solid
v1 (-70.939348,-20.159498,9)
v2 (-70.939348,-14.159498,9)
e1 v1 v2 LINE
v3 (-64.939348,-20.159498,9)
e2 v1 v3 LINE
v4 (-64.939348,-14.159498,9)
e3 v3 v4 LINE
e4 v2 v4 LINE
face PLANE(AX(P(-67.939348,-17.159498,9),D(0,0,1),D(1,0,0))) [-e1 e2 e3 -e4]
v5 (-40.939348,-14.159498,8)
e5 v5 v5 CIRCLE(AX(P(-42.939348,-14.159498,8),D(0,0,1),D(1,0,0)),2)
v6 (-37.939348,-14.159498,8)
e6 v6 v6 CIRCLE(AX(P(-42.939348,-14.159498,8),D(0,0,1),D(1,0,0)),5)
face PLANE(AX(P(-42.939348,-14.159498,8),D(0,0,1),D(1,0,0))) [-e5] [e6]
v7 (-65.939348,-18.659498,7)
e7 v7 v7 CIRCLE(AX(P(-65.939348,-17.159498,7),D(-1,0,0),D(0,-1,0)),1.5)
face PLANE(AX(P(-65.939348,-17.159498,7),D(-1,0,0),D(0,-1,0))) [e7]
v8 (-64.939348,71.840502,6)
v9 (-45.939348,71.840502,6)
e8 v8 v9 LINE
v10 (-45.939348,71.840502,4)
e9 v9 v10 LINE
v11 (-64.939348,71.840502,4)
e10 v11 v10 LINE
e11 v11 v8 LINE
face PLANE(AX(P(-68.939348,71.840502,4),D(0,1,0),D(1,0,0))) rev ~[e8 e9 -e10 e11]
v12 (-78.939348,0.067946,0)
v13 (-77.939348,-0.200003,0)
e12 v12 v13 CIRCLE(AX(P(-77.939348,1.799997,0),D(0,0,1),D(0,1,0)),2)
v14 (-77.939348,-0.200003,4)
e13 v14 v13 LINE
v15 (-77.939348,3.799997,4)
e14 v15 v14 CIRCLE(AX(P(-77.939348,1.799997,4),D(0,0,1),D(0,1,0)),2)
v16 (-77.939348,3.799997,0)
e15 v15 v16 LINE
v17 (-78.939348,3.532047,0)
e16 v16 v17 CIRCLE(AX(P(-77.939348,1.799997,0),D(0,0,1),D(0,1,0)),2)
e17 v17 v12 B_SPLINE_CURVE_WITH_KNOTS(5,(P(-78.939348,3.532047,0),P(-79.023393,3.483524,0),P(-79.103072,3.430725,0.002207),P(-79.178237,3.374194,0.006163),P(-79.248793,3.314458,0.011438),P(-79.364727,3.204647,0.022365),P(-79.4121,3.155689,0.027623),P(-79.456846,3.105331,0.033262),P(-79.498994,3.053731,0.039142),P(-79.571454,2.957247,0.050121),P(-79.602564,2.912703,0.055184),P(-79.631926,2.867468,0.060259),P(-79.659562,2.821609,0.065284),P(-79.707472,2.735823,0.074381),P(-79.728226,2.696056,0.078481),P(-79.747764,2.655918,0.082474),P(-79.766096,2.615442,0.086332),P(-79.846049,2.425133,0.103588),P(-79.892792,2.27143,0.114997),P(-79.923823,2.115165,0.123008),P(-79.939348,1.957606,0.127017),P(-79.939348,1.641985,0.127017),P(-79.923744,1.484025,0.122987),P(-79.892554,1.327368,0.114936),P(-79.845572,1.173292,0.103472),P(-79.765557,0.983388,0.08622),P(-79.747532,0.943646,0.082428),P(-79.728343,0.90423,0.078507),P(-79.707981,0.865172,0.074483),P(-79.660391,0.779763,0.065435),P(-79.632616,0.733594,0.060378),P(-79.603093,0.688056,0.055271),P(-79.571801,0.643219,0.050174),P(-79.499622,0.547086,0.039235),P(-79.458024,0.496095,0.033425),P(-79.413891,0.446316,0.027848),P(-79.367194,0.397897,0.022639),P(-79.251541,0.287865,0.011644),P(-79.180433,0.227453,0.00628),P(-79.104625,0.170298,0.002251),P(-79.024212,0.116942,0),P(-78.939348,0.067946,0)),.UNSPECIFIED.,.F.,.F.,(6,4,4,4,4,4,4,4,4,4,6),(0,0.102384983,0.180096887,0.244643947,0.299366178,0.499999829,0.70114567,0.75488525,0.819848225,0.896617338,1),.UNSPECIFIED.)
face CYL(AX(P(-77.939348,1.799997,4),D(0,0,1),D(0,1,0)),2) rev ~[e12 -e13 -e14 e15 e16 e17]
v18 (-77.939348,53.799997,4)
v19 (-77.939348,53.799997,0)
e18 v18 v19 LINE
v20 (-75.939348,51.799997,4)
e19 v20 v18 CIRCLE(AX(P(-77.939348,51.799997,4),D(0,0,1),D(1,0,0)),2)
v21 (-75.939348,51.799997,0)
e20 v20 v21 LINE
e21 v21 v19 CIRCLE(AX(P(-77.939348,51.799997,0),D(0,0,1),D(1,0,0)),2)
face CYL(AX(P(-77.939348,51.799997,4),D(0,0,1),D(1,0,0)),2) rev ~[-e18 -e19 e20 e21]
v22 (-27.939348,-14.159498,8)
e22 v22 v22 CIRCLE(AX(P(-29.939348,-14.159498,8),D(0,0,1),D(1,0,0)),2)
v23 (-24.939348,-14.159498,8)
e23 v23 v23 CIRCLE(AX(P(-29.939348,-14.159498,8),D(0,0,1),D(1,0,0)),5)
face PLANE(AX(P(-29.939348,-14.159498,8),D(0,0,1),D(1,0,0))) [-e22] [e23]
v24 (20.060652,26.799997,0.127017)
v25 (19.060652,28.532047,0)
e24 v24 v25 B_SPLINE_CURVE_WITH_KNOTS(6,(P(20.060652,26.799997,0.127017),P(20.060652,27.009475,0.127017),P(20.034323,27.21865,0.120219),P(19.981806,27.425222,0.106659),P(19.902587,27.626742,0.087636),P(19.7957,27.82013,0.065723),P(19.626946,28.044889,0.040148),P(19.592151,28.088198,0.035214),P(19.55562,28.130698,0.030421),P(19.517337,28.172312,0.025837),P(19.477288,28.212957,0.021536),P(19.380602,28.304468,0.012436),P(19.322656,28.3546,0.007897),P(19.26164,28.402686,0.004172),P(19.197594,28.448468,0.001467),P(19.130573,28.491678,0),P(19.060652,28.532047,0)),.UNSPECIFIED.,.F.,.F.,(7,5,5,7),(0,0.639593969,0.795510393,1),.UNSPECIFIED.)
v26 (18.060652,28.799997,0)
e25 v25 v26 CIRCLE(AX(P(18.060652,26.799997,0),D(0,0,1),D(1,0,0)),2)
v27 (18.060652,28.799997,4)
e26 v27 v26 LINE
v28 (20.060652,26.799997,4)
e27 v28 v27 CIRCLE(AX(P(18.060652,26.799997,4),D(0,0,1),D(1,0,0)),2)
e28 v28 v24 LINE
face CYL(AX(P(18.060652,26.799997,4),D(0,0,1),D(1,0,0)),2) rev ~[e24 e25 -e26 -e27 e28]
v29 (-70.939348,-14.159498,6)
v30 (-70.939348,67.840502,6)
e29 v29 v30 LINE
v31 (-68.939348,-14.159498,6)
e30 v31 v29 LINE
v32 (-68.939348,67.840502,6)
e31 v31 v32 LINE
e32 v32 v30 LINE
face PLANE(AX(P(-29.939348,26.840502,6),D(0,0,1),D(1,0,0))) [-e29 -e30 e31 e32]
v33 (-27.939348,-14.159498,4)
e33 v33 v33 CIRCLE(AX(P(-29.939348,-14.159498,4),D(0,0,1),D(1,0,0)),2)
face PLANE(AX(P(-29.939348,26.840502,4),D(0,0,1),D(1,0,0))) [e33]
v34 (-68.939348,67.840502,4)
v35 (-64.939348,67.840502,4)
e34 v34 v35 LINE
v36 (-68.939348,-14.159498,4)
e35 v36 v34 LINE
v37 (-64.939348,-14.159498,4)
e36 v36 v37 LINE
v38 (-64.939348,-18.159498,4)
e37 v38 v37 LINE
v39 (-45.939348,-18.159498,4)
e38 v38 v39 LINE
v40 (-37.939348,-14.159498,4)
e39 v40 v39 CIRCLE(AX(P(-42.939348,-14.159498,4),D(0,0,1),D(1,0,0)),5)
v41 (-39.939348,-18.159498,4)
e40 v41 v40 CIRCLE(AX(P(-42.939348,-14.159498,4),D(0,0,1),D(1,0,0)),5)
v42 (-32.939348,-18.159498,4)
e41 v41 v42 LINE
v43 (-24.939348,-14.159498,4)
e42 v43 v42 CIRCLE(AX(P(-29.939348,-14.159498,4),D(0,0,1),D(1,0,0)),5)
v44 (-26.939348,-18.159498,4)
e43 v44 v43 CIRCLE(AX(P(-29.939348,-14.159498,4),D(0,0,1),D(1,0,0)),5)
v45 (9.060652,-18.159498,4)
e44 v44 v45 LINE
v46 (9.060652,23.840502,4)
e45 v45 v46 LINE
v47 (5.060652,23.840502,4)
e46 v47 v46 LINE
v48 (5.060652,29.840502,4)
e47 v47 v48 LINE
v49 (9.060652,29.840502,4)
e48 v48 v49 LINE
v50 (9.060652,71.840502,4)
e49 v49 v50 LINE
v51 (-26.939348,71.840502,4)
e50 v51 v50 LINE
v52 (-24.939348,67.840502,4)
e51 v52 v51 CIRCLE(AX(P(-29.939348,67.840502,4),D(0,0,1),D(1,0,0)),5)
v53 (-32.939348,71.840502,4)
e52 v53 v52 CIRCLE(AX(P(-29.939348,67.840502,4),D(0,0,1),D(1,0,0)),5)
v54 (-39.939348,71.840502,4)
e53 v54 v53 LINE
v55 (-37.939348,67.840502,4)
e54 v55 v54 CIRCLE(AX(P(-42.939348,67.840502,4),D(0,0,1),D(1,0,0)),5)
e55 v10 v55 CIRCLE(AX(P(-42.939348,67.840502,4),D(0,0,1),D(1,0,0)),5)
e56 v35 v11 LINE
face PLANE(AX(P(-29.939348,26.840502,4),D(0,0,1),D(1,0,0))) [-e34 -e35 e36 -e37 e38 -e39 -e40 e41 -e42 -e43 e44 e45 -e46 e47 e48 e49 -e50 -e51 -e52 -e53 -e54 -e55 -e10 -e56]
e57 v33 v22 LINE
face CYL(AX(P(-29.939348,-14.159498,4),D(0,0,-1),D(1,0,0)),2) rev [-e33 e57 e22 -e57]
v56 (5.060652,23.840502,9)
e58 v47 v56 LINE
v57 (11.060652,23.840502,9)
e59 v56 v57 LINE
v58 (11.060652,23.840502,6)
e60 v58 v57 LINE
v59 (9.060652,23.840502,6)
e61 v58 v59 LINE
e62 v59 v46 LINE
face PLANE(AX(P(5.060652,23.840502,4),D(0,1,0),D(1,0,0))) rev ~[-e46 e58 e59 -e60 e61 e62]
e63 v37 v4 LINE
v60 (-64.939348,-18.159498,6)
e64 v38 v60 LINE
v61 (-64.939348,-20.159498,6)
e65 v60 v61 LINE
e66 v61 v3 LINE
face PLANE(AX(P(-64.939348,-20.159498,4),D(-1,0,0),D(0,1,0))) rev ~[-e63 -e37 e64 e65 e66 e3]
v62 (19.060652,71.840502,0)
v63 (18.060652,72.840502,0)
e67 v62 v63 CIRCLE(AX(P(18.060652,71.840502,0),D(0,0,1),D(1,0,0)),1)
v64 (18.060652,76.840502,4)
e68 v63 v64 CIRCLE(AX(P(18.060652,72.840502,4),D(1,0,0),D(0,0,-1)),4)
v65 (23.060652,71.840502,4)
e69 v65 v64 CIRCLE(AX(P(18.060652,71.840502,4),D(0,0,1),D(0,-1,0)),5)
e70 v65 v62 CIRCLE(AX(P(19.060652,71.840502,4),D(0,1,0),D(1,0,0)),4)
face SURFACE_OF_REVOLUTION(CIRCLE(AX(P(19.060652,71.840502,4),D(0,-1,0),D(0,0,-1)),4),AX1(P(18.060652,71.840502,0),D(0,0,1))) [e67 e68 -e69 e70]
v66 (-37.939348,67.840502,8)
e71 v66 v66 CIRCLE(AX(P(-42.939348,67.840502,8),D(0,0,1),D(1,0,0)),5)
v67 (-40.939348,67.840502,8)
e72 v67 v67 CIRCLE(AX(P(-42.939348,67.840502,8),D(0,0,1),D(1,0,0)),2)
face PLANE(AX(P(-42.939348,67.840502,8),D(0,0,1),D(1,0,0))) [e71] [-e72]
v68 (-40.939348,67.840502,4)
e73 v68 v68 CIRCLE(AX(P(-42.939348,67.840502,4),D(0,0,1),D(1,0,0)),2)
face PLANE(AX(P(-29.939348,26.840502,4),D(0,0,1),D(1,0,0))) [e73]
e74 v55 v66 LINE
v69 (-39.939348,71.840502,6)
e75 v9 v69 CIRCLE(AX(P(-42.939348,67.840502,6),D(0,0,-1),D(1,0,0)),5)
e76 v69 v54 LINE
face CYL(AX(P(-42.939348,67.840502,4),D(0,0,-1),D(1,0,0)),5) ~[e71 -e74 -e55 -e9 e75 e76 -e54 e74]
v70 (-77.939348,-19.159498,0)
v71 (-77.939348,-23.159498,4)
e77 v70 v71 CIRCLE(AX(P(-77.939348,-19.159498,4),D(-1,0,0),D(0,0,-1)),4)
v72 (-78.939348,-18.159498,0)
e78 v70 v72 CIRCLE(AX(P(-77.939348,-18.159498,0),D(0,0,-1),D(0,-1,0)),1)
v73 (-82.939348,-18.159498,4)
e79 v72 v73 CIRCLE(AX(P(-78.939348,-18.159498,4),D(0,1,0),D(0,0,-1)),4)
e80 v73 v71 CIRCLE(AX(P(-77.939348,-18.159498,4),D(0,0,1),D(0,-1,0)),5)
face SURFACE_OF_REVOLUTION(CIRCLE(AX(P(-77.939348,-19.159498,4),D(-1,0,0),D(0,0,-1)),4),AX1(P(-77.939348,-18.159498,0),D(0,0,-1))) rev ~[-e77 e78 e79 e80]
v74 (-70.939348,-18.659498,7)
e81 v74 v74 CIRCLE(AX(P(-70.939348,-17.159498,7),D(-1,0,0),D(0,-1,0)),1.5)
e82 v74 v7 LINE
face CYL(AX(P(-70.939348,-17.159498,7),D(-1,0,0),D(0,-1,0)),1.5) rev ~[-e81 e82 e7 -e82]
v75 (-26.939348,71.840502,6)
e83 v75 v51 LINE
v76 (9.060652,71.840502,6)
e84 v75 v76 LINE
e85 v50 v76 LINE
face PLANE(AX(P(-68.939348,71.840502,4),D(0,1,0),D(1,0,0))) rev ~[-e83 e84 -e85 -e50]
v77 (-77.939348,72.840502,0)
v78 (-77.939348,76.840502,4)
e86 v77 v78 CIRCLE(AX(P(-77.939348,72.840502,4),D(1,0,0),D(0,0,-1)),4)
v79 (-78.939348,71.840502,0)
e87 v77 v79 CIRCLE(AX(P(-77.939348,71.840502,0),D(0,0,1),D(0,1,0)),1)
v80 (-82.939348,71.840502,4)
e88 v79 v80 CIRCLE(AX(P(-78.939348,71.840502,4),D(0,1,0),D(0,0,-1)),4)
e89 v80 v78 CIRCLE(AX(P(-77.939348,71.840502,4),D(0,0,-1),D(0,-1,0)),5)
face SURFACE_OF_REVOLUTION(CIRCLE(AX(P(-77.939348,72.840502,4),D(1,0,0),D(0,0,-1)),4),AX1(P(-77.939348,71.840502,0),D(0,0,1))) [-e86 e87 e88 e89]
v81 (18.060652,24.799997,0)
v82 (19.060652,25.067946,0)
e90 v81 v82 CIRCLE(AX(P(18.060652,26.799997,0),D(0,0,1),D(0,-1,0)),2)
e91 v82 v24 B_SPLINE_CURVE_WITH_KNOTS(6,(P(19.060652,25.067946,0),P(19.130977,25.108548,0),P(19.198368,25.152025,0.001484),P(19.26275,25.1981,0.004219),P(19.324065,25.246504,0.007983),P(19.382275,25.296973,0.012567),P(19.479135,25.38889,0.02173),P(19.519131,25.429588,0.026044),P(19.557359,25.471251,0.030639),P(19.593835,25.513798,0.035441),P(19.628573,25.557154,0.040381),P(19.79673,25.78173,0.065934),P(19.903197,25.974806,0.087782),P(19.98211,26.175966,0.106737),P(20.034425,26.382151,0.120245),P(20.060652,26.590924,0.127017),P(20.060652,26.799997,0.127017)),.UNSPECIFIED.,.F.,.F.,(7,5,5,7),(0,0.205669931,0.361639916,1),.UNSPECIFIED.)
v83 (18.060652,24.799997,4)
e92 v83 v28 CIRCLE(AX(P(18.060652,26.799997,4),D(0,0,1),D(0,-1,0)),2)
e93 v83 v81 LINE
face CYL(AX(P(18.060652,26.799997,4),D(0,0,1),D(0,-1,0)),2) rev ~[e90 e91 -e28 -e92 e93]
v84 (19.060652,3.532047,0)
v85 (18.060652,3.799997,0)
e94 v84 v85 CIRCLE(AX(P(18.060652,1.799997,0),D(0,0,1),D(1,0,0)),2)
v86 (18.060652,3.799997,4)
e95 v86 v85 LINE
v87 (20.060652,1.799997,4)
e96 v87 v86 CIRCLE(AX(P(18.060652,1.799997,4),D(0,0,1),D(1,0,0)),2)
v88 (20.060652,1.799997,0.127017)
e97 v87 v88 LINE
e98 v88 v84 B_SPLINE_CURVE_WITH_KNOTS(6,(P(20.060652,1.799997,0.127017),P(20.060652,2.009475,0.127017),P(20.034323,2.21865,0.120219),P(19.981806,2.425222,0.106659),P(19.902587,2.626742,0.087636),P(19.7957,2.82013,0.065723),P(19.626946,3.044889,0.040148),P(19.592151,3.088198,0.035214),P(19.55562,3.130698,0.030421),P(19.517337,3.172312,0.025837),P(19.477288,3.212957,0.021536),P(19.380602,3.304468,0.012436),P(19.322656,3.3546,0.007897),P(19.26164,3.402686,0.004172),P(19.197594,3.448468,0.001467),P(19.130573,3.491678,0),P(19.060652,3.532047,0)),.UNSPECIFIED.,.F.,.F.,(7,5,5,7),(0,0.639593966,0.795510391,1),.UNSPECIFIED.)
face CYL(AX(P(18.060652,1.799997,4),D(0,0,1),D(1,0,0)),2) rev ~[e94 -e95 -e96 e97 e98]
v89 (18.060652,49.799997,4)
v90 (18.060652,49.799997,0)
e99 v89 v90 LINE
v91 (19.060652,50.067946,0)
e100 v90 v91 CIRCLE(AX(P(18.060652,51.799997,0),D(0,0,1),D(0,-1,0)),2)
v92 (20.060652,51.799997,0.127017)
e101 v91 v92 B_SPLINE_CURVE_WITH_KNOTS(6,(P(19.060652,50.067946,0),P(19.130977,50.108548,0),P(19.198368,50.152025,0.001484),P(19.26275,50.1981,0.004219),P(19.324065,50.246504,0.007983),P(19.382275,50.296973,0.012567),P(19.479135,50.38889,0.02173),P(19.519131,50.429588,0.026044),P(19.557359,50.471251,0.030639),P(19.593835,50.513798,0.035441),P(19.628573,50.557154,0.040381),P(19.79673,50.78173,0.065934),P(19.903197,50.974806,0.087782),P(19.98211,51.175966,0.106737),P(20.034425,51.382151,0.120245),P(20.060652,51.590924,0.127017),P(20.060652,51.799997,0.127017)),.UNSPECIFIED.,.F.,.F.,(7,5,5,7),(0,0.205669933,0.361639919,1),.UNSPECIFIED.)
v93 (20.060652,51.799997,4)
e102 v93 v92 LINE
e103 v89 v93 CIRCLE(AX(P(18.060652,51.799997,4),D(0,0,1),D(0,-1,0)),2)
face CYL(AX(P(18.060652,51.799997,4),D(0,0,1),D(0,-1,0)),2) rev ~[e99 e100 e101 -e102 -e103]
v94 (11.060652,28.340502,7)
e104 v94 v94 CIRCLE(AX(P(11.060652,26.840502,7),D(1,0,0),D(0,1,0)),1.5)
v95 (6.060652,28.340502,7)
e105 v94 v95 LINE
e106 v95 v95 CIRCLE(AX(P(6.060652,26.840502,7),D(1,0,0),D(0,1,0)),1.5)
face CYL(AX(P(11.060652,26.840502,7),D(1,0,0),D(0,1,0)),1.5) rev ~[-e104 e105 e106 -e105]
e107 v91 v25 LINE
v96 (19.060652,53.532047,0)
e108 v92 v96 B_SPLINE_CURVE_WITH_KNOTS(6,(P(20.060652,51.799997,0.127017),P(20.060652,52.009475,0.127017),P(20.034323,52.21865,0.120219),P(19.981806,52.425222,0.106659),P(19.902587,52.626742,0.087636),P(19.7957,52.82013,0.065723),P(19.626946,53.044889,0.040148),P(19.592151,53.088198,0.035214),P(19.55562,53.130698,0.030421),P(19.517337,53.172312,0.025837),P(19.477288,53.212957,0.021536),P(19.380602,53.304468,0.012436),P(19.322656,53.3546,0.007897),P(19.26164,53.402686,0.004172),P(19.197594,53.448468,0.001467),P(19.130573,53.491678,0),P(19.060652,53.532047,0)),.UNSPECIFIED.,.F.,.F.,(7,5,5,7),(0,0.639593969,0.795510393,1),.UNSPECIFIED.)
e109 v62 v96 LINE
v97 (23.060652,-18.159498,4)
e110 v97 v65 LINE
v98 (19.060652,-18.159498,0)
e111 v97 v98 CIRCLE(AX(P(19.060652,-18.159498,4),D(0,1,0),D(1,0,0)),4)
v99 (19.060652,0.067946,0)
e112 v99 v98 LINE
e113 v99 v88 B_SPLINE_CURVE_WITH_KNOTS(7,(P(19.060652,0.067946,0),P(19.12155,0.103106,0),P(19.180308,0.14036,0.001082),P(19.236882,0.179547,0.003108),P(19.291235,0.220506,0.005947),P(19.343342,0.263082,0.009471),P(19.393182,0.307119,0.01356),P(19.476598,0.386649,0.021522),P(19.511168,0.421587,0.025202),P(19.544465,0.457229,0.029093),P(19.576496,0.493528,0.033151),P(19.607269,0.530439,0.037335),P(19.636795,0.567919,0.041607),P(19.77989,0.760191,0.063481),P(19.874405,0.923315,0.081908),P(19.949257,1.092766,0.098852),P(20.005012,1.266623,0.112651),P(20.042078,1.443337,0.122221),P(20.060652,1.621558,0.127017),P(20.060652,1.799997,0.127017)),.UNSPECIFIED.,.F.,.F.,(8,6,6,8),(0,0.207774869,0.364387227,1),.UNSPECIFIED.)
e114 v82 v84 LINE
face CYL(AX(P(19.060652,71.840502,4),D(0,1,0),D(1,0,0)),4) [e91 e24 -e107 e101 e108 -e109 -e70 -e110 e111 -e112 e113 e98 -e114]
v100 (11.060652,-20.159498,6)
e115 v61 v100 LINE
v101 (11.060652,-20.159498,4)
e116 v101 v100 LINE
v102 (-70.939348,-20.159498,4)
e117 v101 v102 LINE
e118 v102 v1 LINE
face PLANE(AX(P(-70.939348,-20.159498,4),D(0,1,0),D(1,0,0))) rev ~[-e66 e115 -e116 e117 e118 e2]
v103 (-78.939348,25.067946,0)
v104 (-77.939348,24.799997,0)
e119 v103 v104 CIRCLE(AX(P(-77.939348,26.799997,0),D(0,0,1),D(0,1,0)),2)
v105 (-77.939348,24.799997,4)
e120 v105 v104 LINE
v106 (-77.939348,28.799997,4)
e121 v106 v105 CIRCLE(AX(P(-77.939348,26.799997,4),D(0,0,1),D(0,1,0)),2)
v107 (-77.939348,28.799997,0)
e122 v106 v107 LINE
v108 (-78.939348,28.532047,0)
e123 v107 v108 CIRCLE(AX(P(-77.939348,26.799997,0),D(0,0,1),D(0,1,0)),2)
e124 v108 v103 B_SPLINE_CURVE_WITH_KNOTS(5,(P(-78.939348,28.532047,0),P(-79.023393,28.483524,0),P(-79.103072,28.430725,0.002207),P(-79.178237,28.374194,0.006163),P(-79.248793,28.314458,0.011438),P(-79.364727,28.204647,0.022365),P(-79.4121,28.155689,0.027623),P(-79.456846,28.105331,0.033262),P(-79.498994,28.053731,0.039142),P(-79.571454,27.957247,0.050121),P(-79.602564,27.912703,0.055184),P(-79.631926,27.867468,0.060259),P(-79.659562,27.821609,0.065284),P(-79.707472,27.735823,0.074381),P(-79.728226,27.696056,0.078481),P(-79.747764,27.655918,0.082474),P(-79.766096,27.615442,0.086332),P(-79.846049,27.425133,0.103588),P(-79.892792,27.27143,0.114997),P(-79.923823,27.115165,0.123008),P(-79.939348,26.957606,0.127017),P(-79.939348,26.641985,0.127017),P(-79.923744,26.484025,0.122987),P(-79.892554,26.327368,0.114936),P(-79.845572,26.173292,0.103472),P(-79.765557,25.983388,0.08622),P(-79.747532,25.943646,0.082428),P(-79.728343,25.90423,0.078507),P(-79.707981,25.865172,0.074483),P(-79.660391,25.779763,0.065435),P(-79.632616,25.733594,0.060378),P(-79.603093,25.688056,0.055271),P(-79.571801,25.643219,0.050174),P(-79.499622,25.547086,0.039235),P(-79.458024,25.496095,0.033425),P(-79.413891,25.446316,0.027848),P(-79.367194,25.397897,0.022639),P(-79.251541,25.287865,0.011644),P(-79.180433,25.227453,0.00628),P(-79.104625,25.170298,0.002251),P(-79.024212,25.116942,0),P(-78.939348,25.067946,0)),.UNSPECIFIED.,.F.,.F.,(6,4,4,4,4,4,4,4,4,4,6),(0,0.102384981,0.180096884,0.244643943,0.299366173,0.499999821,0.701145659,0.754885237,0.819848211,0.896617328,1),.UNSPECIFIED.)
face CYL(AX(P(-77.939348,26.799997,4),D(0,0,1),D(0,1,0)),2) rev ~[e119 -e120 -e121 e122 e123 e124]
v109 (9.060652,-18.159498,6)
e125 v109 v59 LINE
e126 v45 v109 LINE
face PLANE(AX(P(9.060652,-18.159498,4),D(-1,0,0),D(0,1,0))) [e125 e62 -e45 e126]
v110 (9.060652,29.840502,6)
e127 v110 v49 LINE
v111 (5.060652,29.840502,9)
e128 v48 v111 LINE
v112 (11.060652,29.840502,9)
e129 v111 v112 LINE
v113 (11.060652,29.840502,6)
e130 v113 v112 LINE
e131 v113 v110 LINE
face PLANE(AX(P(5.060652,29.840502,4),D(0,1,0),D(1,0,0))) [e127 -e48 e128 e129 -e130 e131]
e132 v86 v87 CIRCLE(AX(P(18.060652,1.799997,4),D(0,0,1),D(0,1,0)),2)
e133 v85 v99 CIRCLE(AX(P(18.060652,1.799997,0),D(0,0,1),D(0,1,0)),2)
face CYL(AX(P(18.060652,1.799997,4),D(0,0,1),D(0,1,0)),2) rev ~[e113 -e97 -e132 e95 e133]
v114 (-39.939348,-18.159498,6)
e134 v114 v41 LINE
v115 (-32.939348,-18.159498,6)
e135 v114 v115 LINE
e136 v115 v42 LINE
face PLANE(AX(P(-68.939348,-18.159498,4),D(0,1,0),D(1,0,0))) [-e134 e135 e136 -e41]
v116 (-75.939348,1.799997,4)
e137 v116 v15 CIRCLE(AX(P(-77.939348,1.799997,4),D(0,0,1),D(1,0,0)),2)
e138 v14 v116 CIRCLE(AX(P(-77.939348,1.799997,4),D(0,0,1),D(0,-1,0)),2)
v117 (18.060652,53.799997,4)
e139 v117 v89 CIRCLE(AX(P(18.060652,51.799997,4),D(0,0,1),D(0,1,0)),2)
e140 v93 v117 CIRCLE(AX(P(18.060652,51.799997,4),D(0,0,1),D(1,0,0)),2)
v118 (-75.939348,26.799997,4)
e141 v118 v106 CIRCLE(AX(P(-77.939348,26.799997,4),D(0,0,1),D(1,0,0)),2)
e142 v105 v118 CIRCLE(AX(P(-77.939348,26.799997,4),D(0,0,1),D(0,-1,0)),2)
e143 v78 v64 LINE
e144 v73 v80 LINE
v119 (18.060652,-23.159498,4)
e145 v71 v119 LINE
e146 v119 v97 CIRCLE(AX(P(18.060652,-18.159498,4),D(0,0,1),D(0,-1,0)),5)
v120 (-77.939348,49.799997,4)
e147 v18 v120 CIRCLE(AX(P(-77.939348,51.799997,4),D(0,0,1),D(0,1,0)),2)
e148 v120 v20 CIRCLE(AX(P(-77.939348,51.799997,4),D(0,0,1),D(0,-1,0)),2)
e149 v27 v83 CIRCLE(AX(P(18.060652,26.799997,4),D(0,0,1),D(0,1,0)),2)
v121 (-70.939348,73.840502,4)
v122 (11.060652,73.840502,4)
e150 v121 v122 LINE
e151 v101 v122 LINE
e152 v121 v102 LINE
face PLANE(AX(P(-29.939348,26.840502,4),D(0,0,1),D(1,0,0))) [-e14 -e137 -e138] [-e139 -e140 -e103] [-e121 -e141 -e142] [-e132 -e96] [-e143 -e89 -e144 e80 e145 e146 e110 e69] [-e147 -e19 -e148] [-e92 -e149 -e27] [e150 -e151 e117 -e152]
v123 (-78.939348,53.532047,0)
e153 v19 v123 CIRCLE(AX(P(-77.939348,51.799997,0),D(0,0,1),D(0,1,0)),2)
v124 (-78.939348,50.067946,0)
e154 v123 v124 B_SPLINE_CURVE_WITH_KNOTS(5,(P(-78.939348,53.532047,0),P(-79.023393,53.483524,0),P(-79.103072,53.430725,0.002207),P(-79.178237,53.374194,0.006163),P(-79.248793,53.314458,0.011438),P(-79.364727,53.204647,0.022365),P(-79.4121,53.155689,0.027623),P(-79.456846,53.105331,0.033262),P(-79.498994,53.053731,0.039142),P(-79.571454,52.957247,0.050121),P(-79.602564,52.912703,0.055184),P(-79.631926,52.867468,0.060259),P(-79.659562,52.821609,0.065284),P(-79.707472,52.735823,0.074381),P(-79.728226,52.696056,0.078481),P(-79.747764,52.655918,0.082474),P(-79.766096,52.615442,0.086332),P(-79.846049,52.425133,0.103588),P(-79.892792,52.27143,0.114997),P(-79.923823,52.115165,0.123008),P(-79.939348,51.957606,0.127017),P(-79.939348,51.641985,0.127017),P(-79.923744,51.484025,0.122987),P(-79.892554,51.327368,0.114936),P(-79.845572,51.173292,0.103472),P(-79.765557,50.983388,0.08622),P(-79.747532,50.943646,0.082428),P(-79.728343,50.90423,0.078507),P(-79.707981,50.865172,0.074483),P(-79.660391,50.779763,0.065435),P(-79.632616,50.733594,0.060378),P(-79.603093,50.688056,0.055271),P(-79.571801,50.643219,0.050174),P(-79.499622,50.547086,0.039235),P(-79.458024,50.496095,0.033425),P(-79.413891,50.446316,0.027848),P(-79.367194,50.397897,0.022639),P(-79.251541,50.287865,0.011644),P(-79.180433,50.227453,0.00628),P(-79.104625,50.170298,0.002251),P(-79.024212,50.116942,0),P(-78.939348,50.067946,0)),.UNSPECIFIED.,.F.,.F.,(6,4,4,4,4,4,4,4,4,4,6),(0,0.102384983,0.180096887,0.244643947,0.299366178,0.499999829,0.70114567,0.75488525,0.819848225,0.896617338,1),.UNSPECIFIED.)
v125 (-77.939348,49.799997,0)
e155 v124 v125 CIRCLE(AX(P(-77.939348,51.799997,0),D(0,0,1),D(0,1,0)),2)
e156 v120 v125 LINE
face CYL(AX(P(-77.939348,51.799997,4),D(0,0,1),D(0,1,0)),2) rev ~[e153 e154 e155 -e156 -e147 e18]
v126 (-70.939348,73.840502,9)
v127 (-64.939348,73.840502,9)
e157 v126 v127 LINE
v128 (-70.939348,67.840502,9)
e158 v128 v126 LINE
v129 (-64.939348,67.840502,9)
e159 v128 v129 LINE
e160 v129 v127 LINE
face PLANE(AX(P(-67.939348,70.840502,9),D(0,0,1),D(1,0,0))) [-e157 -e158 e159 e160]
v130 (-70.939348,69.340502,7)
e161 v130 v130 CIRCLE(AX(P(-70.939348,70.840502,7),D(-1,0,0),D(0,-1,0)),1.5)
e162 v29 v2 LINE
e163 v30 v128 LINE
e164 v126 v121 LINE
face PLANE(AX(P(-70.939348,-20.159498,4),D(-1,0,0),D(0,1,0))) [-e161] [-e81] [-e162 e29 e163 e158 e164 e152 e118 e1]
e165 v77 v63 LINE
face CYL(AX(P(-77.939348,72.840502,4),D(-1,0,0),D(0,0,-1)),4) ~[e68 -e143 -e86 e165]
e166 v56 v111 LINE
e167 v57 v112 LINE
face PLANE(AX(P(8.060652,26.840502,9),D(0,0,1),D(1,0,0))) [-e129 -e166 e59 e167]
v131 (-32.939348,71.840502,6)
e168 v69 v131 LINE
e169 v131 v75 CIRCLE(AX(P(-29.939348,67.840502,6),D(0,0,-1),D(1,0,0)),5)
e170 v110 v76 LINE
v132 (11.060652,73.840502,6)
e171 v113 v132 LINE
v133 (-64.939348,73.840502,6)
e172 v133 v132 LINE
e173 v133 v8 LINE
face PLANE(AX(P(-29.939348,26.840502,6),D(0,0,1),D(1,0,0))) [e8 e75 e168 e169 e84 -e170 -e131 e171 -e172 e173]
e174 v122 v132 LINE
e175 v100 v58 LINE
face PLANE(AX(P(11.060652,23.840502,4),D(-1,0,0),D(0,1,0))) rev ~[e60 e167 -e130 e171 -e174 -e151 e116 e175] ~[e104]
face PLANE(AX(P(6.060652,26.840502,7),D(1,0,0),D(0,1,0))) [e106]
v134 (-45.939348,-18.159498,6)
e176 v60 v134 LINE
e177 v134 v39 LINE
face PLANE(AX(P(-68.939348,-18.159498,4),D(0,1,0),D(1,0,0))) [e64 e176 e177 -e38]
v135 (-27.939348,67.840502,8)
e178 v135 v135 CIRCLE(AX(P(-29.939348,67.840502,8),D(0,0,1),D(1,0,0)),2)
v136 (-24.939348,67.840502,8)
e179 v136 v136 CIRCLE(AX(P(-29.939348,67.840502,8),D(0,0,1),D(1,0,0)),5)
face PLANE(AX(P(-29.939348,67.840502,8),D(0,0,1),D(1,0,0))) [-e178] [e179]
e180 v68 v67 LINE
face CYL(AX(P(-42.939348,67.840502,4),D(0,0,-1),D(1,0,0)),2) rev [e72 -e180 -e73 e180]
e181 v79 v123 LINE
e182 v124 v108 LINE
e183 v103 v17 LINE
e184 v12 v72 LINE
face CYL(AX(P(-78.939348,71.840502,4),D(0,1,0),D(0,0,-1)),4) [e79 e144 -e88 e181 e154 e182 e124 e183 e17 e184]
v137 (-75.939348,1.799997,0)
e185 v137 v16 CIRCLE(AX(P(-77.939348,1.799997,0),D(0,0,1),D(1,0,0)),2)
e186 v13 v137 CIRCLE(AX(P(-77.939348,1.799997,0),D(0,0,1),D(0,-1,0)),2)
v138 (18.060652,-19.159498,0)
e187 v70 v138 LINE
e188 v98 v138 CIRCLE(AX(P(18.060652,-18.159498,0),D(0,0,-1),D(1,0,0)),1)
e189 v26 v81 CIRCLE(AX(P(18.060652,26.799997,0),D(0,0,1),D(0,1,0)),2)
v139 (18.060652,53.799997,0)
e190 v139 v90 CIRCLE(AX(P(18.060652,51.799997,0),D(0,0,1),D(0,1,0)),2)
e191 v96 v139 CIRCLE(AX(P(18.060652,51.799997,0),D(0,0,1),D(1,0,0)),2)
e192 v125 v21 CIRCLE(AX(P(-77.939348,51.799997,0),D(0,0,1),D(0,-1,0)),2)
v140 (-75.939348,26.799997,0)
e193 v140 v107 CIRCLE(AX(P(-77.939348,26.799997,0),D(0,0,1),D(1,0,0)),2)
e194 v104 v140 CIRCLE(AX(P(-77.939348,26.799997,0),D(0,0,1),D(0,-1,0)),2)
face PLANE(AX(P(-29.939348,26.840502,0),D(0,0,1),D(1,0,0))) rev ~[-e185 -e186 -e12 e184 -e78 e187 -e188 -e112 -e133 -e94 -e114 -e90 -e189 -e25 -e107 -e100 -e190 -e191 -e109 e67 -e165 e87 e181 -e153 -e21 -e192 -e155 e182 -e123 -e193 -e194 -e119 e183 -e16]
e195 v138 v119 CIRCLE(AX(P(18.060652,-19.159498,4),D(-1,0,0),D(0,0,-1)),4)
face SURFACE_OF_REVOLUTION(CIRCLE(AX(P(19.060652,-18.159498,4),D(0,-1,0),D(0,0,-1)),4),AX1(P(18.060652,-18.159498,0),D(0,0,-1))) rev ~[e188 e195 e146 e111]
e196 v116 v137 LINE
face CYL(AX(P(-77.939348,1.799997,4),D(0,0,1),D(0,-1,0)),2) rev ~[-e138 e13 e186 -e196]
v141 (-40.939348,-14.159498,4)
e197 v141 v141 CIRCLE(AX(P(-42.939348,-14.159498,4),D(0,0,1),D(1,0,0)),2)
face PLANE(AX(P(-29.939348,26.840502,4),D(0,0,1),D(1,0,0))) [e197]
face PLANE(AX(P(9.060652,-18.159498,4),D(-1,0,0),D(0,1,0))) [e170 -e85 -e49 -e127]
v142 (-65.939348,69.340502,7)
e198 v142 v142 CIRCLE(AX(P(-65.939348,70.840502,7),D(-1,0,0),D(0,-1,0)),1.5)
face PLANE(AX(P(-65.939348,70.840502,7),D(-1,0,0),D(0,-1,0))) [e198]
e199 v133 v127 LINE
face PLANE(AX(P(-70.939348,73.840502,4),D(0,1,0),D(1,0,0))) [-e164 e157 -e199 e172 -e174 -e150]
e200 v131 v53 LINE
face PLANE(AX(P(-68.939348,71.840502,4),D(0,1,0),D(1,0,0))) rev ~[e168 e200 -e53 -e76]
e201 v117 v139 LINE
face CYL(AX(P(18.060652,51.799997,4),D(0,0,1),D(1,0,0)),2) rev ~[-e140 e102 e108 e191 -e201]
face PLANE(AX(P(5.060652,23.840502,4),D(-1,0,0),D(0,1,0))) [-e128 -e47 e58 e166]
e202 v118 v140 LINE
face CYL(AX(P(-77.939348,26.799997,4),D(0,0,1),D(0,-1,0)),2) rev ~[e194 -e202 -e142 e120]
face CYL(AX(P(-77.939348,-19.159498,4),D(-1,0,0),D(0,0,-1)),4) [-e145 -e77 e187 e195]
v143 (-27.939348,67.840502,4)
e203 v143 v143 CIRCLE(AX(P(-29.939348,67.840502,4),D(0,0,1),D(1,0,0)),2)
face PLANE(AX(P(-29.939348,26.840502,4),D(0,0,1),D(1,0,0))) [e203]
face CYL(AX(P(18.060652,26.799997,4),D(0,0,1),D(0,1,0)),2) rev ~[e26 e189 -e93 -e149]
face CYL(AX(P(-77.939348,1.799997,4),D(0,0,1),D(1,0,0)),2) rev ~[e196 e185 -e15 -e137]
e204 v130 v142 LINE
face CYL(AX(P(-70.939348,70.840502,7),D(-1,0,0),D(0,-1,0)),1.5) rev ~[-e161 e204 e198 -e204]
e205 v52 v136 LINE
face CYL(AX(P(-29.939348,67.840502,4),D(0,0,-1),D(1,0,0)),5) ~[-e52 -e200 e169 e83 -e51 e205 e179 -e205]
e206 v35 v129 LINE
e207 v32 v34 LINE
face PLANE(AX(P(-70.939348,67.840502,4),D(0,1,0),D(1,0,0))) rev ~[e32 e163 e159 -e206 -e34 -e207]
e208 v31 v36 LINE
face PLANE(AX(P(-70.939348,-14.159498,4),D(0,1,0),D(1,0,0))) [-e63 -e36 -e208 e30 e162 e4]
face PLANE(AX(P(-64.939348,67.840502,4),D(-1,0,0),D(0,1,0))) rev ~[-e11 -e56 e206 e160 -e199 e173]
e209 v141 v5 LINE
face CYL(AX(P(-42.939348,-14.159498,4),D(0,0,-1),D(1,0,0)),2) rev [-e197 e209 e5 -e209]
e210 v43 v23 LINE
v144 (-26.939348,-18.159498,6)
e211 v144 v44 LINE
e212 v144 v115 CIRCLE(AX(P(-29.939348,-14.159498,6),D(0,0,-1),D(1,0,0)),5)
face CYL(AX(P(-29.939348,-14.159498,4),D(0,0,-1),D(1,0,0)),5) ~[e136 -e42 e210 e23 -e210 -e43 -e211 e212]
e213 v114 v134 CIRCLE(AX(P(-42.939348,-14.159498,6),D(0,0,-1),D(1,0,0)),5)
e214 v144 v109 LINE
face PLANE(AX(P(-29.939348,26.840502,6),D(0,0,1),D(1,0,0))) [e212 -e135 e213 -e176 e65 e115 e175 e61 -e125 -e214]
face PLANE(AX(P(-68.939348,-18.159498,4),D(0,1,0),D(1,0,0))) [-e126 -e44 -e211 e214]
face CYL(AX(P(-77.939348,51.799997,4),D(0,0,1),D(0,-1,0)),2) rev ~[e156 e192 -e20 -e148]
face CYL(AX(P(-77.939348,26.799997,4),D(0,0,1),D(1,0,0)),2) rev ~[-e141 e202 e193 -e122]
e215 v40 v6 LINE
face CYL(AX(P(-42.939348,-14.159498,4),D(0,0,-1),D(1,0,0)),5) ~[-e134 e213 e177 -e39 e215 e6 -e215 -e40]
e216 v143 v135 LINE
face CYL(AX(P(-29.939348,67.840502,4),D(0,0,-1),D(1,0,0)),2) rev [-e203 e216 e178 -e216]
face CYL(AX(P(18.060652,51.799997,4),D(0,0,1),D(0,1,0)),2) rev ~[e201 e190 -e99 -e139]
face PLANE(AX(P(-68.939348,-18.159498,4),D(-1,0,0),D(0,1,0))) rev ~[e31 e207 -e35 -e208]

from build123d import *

# Parameters (mm, degrees)
F0_W          = 106
F0_H          = 100
F1_DEPTH      = 4
F2_W          = 82
F2_H          = 94
F2_W_2        = 78
F2_H_2        = 90
F5_DEPTH      = 2
F6_DEPTH      = 25
F4_R          = 5
F4_R_2        = 2
F7_DEPTH      = 4
F8_W          = 6
F8_H          = 6
F9_DEPTH      = 5
F10_R         = 1.5
F11_DEPTH     = 5
F12_W         = 6
F12_H         = 6
F13_DEPTH     = 5
F14_R         = 1.5
F15_DEPTH     = 5
F16_R         = 5
F17_T1_DEPTH  = 90
F17_T3_DEPTH  = 96
F17_T6_ANGLE  = 90
F17_T8_ANGLE  = 90
F17_T10_ANGLE = 90
F17_T12_ANGLE = 90


# Not quite as in the source:
# - a fillet or chamfer that OpenCascade refuses, or shapes differently, is made with other operations: its cross-section is extruded or revolved along the edge and cut away or added


with BuildPart() as f1:
    # F0 (on Top) → F1 (new body)
    with BuildSketch(Plane.XY):
        with Locations((-29.9393483698, 26.8405017372)):
            Rectangle(F0_W, F0_H)
    extrude(amount=F1_DEPTH)

    # F2 (on face) → F5 (join)
    with BuildSketch(Plane.XY.offset(4)):
        with Locations((-29.9393483698, 26.8405017372)):
            Rectangle(F2_W, F2_H)
        with Locations((-29.9393483698, 26.8405017372)):
            Rectangle(F2_W_2, F2_H_2, mode=Mode.SUBTRACT)
    extrude(amount=F5_DEPTH)

    # F3 (on face) → F6 (cut)
    with BuildSketch(Plane.XY.offset(4)):
        with BuildLine():
            ThreePointArc((-77.9393483698, 49.7999965698), (-76.5251348075, 50.3857830074), (-75.9393483698, 51.7999965698))
            ThreePointArc((-75.9393483698, 51.7999965698), (-76.5251348075, 53.2142101321), (-77.9393483698, 53.7999965698))
            Line((-77.9393483698, 53.7999965698), (-77.9393483698, 51.7999965698))
            Line((-77.9393483698, 51.7999965698), (-77.9393483698, 49.7999965698))
        make_face()
        with BuildLine():
            ThreePointArc((-75.9393483698, 1.7999965698), (-76.5251348075, 3.2142101321), (-77.9393483698, 3.7999965698))
            Line((-77.9393483698, 3.7999965698), (-77.9393483698, 1.7999965698))
            Line((-77.9393483698, 1.7999965698), (-77.9393483698, -0.2000034302))
            ThreePointArc((-77.9393483698, -0.2000034302), (-76.5251348075, 0.3857830074), (-75.9393483698, 1.7999965698))
        make_face()
        with BuildLine():
            Line((-77.9393483698, 1.7999965698), (-77.9393483698, 3.7999965698))
            ThreePointArc((-77.9393483698, 3.7999965698), (-79.9393483698, 1.7999965698), (-77.9393483698, -0.2000034302))
            Line((-77.9393483698, -0.2000034302), (-77.9393483698, 1.7999965698))
        make_face()
        with BuildLine():
            ThreePointArc((-75.9393483698, 26.7999965698), (-76.5251348075, 28.2142101321), (-77.9393483698, 28.7999965698))
            Line((-77.9393483698, 28.7999965698), (-77.9393483698, 26.7999965698))
            Line((-77.9393483698, 26.7999965698), (-77.9393483698, 24.7999965698))
            ThreePointArc((-77.9393483698, 24.7999965698), (-76.5251348075, 25.3857830074), (-75.9393483698, 26.7999965698))
        make_face()
        with BuildLine():
            Line((-77.9393483698, 26.7999965698), (-77.9393483698, 28.7999965698))
            ThreePointArc((-77.9393483698, 28.7999965698), (-79.9393483698, 26.7999965698), (-77.9393483698, 24.7999965698))
            Line((-77.9393483698, 24.7999965698), (-77.9393483698, 26.7999965698))
        make_face()
        with BuildLine():
            Line((-77.9393483698, 51.7999965698), (-77.9393483698, 53.7999965698))
            ThreePointArc((-77.9393483698, 53.7999965698), (-79.9393483698, 51.7999965698), (-77.9393483698, 49.7999965698))
            Line((-77.9393483698, 49.7999965698), (-77.9393483698, 51.7999965698))
        make_face()
        with BuildLine():
            ThreePointArc((18.0606516302, 49.7999965698), (19.4748651925, 50.3857830074), (20.0606516302, 51.7999965698))
            ThreePointArc((20.0606516302, 51.7999965698), (19.4748651925, 53.2142101321), (18.0606516302, 53.7999965698))
            Line((18.0606516302, 53.7999965698), (18.0606516302, 51.7999965698))
            Line((18.0606516302, 51.7999965698), (18.0606516302, 49.7999965698))
        make_face()
        with BuildLine():
            ThreePointArc((20.0606516302, 1.7999965698), (19.4748651925, 3.2142101321), (18.0606516302, 3.7999965698))
            ThreePointArc((18.0606516302, 3.7999965698), (16.6464380678, 0.3857830074), (20.0606516302, 1.7999965698))
        make_face()
        with BuildLine():
            ThreePointArc((20.0606516302, 26.7999965698), (19.4748651925, 28.2142101321), (18.0606516302, 28.7999965698))
            Line((18.0606516302, 28.7999965698), (18.0606516302, 26.7999965698))
            Line((18.0606516302, 26.7999965698), (18.0606516302, 24.7999965698))
            ThreePointArc((18.0606516302, 24.7999965698), (19.4748651925, 25.3857830074), (20.0606516302, 26.7999965698))
        make_face()
        with BuildLine():
            Line((18.0606516302, 26.7999965698), (18.0606516302, 28.7999965698))
            ThreePointArc((18.0606516302, 28.7999965698), (16.0606516302, 26.7999965698), (18.0606516302, 24.7999965698))
            Line((18.0606516302, 24.7999965698), (18.0606516302, 26.7999965698))
        make_face()
        with BuildLine():
            Line((18.0606516302, 51.7999965698), (18.0606516302, 53.7999965698))
            ThreePointArc((18.0606516302, 53.7999965698), (16.0606516302, 51.7999965698), (18.0606516302, 49.7999965698))
            Line((18.0606516302, 49.7999965698), (18.0606516302, 51.7999965698))
        make_face()
    extrude(amount=-F6_DEPTH, mode=Mode.SUBTRACT)

    # F4 (on face) → F7 (join)
    with BuildSketch(Plane.XY.offset(4)):
        with Locations((-42.9393483698, 67.8405017372)):
            Circle(F4_R)
        with Locations((-42.9393483698, 67.8405017372)):
            Circle(F4_R_2, mode=Mode.SUBTRACT)
        with Locations((-29.9393483698, 67.8405017372)):
            Circle(F4_R)
        with Locations((-29.9393483698, 67.8405017372)):
            Circle(F4_R_2, mode=Mode.SUBTRACT)
        with Locations((-42.9393483698, -14.1594982628)):
            Circle(F4_R)
        with Locations((-42.9393483698, -14.1594982628)):
            Circle(F4_R_2, mode=Mode.SUBTRACT)
        with Locations((-29.9393483698, -14.1594982628)):
            Circle(F4_R)
        with Locations((-29.9393483698, -14.1594982628)):
            Circle(F4_R_2, mode=Mode.SUBTRACT)
    extrude(amount=F7_DEPTH)

    # F8 (on face) → F9 (join)
    with BuildSketch(Plane.XY.offset(4)):
        with Locations((-67.9393483698, 70.8405017372)):
            Rectangle(F8_W, F8_H)
        with Locations((-67.9393483698, -17.1594982628)):
            Rectangle(F8_W, F8_H)
    extrude(amount=F9_DEPTH)

    # F10 (on face) → F11 (cut)
    with BuildSketch(Plane(origin=(-70.9393483698, 0, 0), x_dir=(0, -1, 0), z_dir=(-1, 0, 0))):
        with Locations((-70.8405017372, 7)):
            Circle(F10_R)
        with Locations((17.1594982628, 7)):
            Circle(F10_R)
    extrude(amount=-F11_DEPTH, mode=Mode.SUBTRACT)

    # F12 (on face) → F13 (join)
    with BuildSketch(Plane.XY.offset(4)):
        with Locations((8.0606516302, 26.8405017372)):
            Rectangle(F12_W, F12_H)
    extrude(amount=F13_DEPTH)

    # F14 (on face) → F15 (cut)
    with BuildSketch(Plane.YZ.offset(11.0606516302)):
        with Locations((26.8405017372, 7)):
            Circle(F14_R)
    extrude(amount=-F15_DEPTH, mode=Mode.SUBTRACT)

    # F16
    f16_edges = [f1.edges().sort_by_distance(p)[0] for p in [
        (-82.939348, 76.840502, 2),
        (23.060652, 76.840502, 2),
        (23.060652, -23.159498, 2),
        (-82.939348, -23.159498, 2),
    ]]
    fillet(f16_edges, radius=F16_R)

    # F17: fillet of radius 4 on 8 edges, made by hand

    # F17_s2 → F17_t1 (cut)
    with BuildSketch(Plane.XZ.offset(-71.8405017372)):
        with BuildLine():
            ThreePointArc((23.0606516302, 4), (21.8890787549, 1.1715728753), (19.0606516302, 0))
            Line((19.0606516302, 0), (23.0606516302, 0))
            Line((23.0606516302, 0), (23.0606516302, 4))
        make_face()
        with BuildLine():
            ThreePointArc((-78.9393483698, 0), (-81.7677754946, 1.1715728753), (-82.9393483698, 4))
            Line((-82.9393483698, 4), (-82.9393483698, 0))
            Line((-82.9393483698, 0), (-78.9393483698, 0))
        make_face()
    extrude(amount=F17_T1_DEPTH, mode=Mode.SUBTRACT)

    # F17_s4 → F17_t3 (cut)
    with BuildSketch(Plane.YZ.offset(-77.9393483698)):
        with BuildLine():
            ThreePointArc((-19.1594982628, 0), (-21.9879253875, 1.1715728753), (-23.1594982628, 4))
            Line((-23.1594982628, 4), (-23.1594982628, 0))
            Line((-23.1594982628, 0), (-19.1594982628, 0))
        make_face()
        with BuildLine():
            ThreePointArc((72.8405017372, 0), (75.668928862, 1.1715728753), (76.8405017372, 4))
            Line((76.8405017372, 4), (76.8405017372, 0))
            Line((76.8405017372, 0), (72.8405017372, 0))
        make_face()
    extrude(amount=F17_T3_DEPTH, mode=Mode.SUBTRACT)

    # F17_s5 → F17_t6 (revolve, cut)
    with BuildSketch(Plane.XZ.offset(18.1594982628)):
        with BuildLine():
            ThreePointArc((19.0606516302, 0), (21.8890787549, 1.1715728753), (23.0606516302, 4))
            Line((23.0606516302, 4), (23.0606516302, 0))
            Line((23.0606516302, 0), (19.0606516302, 0))
        make_face()
    revolve(axis=Axis((18.0606516302, -18.1594982628, 0), (0, 0, -1)), revolution_arc=F17_T6_ANGLE, mode=Mode.SUBTRACT)

    # F17_s7 → F17_t8 (revolve, cut)
    with BuildSketch(Plane.XZ.offset(-71.8405017372)):
        with BuildLine():
            ThreePointArc((19.0606516302, 0), (21.8890787549, 1.1715728753), (23.0606516302, 4))
            Line((23.0606516302, 4), (23.0606516302, 0))
            Line((23.0606516302, 0), (19.0606516302, 0))
        make_face()
    revolve(axis=Axis((18.0606516302, 71.8405017372, 0), (0, 0, 1)), revolution_arc=F17_T8_ANGLE, mode=Mode.SUBTRACT)

    # F17_s9 → F17_t10 (revolve, cut)
    with BuildSketch(Plane.YZ.offset(-77.9393483698)):
        with BuildLine():
            ThreePointArc((-19.1594982628, 0), (-21.9879253875, 1.1715728753), (-23.1594982628, 4))
            Line((-23.1594982628, 4), (-23.1594982628, 0))
            Line((-23.1594982628, 0), (-19.1594982628, 0))
        make_face()
    revolve(axis=Axis((-77.9393483698, -18.1594982628, 0), (0, 0, -1)), revolution_arc=F17_T10_ANGLE, mode=Mode.SUBTRACT)

    # F17_s11 → F17_t12 (revolve, cut)
    with BuildSketch(Plane.YZ.offset(-77.9393483698)):
        with BuildLine():
            ThreePointArc((72.8405017372, 0), (75.668928862, 1.1715728753), (76.8405017372, 4))
            Line((76.8405017372, 4), (76.8405017372, 0))
            Line((76.8405017372, 0), (72.8405017372, 0))
        make_face()
    revolve(axis=Axis((-77.9393483698, 71.8405017372, 0), (0, 0, 1)), revolution_arc=F17_T12_ANGLE, mode=Mode.SUBTRACT)


solid = f1.part
